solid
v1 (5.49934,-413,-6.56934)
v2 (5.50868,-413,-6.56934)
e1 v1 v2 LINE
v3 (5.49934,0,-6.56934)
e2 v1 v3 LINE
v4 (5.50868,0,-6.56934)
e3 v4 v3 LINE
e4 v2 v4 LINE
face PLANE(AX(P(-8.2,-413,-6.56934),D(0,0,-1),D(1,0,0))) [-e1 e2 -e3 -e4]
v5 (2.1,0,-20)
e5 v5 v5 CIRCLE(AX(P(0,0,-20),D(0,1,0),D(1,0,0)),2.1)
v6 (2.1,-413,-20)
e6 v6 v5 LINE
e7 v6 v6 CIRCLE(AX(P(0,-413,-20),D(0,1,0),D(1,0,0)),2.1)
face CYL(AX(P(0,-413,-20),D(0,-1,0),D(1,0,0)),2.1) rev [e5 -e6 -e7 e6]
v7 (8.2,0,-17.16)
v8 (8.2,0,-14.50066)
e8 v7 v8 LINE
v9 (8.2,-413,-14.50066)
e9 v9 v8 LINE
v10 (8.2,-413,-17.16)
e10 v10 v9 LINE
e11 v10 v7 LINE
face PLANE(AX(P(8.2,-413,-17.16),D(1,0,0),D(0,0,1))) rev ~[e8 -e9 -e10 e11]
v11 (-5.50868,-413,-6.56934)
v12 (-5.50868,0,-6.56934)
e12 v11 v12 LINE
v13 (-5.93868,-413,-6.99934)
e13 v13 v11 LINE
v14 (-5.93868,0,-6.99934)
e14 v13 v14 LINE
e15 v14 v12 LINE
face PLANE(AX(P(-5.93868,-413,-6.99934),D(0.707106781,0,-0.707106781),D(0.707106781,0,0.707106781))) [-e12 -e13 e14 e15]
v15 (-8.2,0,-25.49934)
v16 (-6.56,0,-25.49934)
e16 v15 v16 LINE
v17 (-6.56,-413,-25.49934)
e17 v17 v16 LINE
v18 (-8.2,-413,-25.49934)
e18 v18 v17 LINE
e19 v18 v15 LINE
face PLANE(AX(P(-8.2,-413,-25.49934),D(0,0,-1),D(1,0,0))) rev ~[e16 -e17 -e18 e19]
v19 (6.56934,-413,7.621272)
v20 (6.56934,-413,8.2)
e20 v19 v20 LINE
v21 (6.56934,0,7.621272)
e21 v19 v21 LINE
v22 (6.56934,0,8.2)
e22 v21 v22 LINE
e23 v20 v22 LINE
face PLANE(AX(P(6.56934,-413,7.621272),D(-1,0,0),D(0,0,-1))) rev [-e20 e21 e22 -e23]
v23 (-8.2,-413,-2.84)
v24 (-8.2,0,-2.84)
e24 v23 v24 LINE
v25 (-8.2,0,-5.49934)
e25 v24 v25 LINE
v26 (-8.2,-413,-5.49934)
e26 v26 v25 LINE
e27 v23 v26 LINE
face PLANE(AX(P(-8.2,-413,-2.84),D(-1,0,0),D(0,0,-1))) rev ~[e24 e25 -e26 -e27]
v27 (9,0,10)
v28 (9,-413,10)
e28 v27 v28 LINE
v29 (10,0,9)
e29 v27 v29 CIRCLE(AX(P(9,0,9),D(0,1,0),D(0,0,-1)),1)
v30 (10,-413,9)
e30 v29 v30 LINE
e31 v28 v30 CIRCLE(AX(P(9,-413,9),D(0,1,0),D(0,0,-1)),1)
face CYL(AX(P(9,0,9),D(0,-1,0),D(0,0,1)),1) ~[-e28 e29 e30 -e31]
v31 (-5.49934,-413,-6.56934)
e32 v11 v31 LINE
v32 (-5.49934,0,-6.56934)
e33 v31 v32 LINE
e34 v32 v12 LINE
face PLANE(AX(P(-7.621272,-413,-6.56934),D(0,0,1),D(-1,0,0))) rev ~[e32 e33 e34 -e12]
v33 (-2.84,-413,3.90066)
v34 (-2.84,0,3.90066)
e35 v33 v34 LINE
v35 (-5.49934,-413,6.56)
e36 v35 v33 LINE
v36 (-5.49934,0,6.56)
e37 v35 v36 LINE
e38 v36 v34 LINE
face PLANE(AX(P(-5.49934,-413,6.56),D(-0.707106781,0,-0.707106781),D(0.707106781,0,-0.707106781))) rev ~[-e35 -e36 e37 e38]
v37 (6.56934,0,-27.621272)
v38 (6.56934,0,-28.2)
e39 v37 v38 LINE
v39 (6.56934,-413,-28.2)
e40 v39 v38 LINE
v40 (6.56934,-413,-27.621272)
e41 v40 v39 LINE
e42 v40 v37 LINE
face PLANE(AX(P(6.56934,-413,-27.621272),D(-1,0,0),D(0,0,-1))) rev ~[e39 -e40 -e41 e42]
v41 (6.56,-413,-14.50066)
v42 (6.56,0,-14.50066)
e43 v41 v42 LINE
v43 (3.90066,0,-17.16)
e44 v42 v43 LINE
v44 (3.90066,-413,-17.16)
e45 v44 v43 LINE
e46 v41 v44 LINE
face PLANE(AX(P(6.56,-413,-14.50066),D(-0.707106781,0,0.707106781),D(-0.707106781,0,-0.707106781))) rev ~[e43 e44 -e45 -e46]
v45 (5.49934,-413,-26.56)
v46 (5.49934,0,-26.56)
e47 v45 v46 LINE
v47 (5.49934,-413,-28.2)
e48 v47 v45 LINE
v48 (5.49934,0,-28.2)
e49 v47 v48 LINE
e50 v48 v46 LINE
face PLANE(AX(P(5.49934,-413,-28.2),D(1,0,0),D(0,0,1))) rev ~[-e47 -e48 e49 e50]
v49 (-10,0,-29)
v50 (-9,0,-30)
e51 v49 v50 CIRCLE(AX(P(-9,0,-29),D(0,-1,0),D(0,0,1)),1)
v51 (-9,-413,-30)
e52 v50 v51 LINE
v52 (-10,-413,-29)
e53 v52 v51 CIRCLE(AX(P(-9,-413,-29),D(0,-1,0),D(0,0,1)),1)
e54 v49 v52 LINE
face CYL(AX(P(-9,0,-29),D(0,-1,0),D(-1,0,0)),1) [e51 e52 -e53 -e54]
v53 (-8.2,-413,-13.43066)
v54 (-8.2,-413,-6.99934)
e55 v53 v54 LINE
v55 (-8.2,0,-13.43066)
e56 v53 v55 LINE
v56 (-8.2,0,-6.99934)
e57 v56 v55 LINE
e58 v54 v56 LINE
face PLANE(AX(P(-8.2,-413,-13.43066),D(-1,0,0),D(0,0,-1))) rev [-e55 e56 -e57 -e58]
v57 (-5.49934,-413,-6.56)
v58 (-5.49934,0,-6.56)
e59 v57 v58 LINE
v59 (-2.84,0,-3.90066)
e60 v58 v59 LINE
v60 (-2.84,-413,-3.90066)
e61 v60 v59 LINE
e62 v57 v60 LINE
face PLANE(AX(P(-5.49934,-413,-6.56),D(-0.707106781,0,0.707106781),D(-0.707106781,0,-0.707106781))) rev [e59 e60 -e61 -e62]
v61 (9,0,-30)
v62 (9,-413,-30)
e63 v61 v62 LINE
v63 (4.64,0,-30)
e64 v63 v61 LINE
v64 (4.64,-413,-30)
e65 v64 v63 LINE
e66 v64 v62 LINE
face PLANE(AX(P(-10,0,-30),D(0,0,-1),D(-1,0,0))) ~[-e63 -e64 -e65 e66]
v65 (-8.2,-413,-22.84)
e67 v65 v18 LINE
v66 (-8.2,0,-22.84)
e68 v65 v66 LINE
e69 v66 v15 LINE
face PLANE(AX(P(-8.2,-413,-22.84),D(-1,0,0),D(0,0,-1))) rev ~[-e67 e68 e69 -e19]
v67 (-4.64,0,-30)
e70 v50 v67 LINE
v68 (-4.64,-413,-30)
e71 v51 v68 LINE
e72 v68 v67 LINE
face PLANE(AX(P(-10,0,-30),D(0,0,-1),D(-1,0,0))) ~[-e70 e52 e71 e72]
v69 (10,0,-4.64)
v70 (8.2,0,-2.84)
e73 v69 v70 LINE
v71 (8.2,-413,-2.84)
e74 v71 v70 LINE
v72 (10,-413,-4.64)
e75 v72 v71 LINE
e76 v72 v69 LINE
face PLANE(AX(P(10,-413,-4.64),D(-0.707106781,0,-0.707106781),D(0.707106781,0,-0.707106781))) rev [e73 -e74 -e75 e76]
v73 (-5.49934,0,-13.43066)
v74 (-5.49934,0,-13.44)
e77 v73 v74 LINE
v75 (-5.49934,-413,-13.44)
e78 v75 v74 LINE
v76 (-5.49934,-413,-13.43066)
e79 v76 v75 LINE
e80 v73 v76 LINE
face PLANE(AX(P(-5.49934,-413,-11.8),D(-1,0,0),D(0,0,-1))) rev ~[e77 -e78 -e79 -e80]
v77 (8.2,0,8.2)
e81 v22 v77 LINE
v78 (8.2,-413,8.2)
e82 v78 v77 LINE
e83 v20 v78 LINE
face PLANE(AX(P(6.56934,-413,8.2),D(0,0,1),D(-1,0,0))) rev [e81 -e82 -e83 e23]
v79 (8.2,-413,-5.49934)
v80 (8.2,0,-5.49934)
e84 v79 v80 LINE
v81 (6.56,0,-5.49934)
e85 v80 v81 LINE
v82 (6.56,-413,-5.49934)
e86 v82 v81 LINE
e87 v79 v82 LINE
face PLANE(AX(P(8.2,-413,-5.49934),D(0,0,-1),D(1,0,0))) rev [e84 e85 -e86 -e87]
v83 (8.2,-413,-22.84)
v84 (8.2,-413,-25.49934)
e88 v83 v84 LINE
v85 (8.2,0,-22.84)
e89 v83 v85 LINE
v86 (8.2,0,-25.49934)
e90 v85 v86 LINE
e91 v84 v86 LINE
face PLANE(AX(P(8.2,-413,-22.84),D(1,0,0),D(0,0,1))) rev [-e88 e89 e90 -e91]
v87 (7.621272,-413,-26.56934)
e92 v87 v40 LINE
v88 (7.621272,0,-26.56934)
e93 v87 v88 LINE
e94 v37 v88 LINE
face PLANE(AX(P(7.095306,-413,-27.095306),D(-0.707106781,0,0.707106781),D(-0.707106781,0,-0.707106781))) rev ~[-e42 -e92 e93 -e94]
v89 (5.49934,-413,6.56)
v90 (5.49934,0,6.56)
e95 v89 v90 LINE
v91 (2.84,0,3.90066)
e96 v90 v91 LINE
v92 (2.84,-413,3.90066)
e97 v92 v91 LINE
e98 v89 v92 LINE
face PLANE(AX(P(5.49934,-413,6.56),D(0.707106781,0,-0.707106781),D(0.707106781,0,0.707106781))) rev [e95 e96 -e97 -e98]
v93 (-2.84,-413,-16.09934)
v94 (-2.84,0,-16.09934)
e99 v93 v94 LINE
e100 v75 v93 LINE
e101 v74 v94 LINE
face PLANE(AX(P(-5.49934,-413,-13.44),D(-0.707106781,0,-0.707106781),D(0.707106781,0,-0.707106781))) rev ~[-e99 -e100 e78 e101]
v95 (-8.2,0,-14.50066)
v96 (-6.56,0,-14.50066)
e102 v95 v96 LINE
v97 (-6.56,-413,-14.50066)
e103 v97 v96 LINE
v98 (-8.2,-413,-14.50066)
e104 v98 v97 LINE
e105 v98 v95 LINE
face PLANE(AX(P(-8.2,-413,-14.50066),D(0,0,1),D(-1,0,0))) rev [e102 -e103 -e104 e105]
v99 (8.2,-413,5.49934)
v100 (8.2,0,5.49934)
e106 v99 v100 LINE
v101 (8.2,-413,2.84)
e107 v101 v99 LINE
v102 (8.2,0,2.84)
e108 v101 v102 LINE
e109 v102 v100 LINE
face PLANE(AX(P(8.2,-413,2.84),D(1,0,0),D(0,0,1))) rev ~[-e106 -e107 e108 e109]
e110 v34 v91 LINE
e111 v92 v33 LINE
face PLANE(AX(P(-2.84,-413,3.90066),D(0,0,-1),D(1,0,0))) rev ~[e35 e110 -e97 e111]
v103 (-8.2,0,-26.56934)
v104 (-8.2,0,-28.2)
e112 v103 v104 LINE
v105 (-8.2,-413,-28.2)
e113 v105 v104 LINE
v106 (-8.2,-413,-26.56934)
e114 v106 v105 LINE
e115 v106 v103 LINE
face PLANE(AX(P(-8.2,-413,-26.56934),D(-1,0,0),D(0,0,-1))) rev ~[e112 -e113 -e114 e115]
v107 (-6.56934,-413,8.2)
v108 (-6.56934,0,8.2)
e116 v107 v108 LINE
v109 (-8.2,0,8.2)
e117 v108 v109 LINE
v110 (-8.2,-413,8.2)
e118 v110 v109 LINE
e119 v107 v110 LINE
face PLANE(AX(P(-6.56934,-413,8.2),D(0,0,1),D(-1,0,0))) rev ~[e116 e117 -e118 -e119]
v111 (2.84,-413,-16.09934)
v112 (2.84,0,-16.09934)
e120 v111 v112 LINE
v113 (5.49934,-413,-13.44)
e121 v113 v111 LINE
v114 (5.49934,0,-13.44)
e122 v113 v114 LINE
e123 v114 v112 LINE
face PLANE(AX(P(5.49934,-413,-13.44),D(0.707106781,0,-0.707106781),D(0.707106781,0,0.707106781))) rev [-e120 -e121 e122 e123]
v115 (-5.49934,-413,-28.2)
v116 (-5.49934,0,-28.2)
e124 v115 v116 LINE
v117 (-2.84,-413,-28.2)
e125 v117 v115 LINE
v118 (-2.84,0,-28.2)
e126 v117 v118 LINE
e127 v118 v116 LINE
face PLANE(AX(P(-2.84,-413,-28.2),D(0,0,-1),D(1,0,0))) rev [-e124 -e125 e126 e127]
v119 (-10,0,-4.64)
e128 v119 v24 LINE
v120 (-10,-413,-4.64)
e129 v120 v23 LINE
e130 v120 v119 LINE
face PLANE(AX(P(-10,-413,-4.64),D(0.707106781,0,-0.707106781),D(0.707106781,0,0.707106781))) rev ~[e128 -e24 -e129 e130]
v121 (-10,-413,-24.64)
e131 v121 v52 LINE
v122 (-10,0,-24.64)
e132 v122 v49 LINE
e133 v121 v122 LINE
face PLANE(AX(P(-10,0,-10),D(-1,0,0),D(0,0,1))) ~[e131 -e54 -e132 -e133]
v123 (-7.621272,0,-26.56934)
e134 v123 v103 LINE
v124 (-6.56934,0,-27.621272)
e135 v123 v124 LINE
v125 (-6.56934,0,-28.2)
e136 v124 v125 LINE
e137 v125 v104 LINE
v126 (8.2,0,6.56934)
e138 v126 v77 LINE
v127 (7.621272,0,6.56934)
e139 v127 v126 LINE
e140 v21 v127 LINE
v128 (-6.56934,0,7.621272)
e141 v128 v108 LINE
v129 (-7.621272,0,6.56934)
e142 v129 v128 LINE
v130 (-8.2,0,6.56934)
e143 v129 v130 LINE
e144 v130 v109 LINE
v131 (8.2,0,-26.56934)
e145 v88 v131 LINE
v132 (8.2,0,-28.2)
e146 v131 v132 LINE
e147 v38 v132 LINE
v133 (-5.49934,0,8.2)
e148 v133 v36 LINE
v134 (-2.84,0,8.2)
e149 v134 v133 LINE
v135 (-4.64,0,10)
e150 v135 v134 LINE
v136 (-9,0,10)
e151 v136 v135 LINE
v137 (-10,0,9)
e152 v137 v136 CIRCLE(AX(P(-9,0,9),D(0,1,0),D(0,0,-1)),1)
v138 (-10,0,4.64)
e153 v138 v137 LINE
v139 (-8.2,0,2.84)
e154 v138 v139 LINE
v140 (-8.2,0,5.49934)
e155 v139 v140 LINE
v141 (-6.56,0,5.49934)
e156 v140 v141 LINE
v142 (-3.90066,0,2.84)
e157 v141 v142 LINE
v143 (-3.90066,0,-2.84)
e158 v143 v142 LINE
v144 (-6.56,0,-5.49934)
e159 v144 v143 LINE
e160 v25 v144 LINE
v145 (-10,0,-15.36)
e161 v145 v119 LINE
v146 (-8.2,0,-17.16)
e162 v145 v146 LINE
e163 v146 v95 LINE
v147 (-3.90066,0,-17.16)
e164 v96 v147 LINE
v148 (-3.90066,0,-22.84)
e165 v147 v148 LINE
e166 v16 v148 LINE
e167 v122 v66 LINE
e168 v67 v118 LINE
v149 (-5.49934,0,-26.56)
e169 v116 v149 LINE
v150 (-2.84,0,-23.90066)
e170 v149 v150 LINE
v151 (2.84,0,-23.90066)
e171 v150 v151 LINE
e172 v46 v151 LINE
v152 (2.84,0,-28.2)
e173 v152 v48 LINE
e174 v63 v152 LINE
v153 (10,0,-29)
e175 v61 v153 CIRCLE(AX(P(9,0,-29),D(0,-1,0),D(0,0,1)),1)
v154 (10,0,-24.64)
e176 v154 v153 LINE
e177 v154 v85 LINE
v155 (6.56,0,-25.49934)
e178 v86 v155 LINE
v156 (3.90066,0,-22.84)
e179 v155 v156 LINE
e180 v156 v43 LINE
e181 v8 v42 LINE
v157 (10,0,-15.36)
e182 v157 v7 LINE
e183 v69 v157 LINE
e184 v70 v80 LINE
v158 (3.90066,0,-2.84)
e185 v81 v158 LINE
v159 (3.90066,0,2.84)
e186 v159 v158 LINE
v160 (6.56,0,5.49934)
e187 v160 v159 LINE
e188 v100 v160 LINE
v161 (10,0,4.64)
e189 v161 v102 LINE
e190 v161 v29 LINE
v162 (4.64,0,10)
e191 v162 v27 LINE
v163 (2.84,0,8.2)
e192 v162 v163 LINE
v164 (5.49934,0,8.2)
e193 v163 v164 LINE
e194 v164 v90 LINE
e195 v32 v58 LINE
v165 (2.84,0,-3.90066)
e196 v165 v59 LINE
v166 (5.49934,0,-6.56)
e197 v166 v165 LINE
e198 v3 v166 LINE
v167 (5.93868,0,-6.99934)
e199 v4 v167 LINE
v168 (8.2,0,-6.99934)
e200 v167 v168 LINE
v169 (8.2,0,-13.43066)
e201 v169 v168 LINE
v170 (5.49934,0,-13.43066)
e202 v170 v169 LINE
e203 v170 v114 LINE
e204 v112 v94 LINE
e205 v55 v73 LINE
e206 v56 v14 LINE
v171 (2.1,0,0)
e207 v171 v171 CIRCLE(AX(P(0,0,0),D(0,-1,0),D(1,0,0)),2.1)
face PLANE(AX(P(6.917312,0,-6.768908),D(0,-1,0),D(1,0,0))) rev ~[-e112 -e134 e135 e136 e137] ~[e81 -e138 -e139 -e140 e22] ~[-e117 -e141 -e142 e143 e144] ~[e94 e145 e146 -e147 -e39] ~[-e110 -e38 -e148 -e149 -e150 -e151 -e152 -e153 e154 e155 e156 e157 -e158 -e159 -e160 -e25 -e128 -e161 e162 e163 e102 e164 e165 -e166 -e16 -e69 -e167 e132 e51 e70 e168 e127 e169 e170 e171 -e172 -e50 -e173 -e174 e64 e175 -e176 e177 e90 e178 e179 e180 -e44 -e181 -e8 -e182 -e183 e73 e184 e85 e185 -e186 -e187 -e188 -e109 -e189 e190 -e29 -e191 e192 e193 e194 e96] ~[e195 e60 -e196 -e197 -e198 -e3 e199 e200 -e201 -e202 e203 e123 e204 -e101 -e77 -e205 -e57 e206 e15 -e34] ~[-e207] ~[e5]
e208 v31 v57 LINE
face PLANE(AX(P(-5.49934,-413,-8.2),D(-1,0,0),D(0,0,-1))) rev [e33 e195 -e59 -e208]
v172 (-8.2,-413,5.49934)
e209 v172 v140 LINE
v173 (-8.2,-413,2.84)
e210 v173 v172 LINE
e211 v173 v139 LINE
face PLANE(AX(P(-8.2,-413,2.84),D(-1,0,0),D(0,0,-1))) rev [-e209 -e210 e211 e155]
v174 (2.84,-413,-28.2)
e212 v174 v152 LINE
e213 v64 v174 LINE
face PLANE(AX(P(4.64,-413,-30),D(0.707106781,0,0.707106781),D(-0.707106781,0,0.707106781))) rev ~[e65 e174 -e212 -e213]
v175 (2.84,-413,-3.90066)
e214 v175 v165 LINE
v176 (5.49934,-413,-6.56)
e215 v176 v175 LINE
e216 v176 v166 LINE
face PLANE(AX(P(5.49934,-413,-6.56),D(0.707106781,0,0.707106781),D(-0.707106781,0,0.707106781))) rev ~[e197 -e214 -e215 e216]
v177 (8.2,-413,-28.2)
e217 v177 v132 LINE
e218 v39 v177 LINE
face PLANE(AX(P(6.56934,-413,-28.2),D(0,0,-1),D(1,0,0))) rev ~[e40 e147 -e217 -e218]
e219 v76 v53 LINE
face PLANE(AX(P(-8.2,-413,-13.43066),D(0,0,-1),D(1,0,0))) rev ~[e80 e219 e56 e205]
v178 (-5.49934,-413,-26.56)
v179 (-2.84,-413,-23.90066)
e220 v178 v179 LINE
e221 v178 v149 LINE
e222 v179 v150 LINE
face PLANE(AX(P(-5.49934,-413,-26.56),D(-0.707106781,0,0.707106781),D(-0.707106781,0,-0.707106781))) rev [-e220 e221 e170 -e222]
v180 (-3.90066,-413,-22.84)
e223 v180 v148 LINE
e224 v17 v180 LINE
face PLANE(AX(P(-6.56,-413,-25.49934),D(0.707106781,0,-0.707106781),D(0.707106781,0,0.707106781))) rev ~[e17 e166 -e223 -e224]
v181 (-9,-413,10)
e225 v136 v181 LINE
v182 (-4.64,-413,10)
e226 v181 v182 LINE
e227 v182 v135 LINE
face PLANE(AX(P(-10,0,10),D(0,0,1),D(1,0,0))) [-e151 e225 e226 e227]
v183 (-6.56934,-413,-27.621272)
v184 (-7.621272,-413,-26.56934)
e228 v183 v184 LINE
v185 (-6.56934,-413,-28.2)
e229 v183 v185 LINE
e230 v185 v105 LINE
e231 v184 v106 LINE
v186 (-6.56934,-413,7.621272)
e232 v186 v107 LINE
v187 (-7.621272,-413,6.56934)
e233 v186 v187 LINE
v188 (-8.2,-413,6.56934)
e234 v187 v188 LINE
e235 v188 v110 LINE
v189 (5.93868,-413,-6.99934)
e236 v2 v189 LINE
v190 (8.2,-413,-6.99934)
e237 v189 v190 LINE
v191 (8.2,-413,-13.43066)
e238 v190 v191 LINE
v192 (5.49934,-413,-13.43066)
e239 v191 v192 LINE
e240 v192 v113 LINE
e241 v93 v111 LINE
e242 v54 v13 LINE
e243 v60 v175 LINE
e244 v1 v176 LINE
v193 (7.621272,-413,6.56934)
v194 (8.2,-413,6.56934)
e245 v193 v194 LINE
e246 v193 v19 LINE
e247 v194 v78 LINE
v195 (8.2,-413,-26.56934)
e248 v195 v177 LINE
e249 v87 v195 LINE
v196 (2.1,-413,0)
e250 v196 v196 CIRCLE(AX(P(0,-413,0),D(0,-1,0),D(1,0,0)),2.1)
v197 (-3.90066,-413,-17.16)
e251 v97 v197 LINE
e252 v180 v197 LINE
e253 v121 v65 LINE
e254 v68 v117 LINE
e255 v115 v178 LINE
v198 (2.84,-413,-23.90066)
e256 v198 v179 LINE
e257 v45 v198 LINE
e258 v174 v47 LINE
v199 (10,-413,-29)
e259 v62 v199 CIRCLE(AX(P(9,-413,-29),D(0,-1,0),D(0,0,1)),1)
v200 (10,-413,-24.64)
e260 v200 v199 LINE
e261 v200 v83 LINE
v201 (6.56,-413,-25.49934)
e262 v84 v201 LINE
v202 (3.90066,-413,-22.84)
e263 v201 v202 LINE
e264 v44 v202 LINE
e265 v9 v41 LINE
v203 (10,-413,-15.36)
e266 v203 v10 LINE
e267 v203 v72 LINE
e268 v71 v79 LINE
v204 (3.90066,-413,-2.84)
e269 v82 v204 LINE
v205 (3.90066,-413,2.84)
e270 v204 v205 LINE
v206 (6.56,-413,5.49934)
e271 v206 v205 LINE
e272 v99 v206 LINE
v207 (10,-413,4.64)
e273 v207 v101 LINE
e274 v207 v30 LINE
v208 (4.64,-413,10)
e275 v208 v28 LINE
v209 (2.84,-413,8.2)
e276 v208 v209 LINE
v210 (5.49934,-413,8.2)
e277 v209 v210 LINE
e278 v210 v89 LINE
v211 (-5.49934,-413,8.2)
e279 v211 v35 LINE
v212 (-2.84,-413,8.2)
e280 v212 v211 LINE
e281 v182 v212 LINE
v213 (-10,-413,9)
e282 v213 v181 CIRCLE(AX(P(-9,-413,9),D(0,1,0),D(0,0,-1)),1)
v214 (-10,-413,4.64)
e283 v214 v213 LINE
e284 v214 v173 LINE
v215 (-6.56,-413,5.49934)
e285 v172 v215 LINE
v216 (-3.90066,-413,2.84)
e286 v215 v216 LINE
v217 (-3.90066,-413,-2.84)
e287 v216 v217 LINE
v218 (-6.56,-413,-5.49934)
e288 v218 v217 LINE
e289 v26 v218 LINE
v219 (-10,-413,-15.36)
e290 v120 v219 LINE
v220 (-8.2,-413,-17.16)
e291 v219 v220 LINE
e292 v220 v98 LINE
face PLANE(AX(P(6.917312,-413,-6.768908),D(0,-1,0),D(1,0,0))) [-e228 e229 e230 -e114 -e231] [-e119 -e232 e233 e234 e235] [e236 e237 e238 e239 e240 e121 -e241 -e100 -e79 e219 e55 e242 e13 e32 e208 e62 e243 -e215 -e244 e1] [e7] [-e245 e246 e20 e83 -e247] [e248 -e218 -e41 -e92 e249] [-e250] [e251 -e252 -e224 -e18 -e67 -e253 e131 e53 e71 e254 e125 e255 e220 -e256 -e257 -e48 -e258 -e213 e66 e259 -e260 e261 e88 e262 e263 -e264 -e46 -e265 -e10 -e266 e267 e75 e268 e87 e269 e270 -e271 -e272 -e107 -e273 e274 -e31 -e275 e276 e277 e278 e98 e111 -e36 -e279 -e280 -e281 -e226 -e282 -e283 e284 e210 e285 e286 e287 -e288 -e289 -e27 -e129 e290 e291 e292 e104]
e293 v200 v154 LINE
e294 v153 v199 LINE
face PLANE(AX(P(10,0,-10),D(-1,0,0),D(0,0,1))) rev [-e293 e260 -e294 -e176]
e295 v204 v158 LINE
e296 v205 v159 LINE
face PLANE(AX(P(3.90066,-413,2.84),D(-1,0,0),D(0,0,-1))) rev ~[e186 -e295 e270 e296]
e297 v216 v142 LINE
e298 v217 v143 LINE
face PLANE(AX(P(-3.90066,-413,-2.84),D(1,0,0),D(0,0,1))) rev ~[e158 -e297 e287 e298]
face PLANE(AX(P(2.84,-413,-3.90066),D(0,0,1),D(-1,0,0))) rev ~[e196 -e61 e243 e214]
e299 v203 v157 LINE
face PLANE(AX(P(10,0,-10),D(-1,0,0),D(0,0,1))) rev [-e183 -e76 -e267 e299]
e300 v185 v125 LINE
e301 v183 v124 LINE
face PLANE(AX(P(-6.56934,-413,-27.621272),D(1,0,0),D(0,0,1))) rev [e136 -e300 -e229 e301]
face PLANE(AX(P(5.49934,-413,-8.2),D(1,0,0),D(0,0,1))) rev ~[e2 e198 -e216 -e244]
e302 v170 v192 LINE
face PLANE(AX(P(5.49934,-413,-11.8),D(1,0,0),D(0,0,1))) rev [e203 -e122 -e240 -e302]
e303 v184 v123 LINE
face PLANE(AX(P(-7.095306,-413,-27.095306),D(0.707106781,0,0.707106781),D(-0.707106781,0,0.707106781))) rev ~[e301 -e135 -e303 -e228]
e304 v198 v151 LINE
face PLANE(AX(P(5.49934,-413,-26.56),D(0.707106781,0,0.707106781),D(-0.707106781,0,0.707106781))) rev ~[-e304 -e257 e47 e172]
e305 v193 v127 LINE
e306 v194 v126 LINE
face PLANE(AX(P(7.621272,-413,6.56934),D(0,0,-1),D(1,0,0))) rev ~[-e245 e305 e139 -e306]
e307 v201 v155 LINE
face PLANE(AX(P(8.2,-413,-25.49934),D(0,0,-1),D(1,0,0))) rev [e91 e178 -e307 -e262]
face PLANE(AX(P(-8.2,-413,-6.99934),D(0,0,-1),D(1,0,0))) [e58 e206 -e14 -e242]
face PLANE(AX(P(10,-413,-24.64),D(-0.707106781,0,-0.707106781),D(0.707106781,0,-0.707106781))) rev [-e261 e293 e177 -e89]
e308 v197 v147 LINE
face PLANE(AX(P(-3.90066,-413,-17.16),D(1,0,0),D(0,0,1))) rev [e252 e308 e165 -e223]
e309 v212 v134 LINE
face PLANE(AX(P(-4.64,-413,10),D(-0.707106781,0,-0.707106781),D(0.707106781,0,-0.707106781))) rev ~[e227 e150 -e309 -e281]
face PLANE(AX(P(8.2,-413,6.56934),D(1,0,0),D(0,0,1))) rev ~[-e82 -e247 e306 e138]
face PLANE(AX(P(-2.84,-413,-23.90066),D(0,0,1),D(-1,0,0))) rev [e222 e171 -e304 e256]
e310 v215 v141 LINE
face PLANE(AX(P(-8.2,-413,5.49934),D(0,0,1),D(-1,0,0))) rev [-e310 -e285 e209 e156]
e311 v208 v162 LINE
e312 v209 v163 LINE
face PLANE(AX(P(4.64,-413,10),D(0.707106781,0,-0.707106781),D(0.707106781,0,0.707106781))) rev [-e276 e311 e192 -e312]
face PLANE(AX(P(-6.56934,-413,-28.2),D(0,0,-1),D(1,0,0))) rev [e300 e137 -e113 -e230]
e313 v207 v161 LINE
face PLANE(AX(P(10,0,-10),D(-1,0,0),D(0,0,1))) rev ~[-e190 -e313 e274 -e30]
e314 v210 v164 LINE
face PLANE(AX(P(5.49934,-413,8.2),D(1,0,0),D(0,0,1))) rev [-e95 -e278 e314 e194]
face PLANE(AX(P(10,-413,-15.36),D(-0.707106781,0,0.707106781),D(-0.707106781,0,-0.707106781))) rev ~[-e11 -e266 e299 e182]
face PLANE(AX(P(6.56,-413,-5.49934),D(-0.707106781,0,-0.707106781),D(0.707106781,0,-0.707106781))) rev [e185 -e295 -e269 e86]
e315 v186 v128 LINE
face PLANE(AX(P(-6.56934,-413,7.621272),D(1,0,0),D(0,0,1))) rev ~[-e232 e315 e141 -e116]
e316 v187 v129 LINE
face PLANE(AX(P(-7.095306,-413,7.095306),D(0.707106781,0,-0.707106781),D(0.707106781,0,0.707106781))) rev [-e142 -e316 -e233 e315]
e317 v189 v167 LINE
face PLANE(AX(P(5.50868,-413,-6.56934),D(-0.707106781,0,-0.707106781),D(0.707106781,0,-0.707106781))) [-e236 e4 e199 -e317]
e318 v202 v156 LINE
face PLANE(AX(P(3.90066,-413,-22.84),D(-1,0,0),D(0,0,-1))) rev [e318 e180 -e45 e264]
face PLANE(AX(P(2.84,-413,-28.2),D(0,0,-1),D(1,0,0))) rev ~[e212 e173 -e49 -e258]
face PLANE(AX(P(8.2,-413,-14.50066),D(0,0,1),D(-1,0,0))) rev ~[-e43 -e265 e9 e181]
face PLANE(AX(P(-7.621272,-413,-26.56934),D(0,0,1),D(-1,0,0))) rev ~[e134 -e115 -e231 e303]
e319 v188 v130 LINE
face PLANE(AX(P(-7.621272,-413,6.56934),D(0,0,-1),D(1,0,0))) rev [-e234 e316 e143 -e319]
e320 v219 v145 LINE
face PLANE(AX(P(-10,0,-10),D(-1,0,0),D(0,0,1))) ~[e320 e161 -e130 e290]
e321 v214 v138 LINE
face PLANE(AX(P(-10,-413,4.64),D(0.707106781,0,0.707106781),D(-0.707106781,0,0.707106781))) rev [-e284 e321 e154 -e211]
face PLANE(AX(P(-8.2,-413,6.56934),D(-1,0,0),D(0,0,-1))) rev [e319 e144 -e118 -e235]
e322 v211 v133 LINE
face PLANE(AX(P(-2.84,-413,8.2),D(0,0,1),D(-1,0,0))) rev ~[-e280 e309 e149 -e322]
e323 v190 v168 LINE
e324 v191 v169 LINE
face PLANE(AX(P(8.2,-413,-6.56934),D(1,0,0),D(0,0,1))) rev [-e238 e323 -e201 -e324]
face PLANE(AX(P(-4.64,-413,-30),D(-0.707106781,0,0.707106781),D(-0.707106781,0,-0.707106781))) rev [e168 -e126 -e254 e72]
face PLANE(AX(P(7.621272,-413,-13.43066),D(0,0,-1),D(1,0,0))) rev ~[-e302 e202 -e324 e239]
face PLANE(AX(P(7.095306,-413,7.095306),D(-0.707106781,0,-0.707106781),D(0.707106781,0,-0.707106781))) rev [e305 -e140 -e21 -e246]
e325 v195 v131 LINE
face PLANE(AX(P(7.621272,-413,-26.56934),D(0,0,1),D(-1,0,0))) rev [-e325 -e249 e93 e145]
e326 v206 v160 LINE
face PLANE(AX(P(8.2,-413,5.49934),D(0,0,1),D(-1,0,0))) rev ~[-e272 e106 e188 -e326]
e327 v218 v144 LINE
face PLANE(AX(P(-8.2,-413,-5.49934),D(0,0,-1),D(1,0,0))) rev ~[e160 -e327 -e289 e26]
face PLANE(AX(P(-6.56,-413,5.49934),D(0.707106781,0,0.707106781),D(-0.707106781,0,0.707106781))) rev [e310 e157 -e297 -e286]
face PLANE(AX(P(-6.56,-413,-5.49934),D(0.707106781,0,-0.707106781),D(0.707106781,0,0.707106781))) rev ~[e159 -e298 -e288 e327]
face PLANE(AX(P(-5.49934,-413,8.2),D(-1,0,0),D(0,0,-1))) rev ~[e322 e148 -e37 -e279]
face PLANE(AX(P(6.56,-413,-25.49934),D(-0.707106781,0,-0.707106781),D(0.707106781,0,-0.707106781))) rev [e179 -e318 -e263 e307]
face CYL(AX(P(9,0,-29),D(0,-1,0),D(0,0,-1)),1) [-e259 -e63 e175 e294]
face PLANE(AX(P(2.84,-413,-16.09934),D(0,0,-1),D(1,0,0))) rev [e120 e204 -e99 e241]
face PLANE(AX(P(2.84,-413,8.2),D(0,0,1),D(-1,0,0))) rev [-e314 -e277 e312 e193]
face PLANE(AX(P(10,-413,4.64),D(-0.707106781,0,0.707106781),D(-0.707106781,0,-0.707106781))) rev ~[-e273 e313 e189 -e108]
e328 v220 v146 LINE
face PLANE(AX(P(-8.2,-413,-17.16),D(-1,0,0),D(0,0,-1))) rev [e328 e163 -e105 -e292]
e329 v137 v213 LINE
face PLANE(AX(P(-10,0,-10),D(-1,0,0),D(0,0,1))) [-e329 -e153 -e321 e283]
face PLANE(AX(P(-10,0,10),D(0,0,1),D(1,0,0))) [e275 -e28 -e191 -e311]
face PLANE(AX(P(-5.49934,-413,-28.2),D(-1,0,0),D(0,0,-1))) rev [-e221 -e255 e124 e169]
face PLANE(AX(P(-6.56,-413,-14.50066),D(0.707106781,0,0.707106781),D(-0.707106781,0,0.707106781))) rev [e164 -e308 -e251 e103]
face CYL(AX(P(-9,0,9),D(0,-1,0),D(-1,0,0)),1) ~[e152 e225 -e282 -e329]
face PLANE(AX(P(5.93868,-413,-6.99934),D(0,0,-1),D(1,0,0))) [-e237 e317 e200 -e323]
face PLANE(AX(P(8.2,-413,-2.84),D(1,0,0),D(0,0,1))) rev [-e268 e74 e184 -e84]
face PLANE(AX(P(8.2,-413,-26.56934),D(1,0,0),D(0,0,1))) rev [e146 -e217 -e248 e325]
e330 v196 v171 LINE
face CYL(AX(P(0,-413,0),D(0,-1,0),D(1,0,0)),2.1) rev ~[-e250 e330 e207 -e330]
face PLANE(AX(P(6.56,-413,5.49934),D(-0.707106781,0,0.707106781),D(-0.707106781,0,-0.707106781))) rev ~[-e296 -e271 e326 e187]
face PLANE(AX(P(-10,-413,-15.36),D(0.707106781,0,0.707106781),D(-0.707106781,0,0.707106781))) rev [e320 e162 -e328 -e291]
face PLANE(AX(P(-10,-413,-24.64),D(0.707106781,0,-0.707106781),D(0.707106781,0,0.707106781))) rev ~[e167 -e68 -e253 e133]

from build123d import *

# Parameters (mm, degrees)
F0_W             = 20
F0_H             = 20
F1_DEPTH         = 413
F2_R             = 2.1
F3_DEPTH         = 413.001
F4_R             = 1
F6_DEPTH         = 413.001
F6_COPIES3_COUNT = 2
F6_COPIES3_ANGLE = 90
F6_COPIES4_COUNT = 2
F6_COPIES4_ANGLE = 270
F6_COPIES6_COUNT = 2
F9_W             = 16.4
F9_H             = 6.8613203436
F10_DEPTH        = 413.001
F12_DEPTH        = 413


# Not quite as in the source:
# - a pattern or mirror of a feature is missing from the dataset's text; its kind, count and spacing are read off the source's solid


with BuildPart() as f1:
    # F0 (on Front) → F1 (new body)
    with BuildSketch(Plane.XZ):
        Rectangle(F0_W, F0_H)
    extrude(amount=F1_DEPTH)

    # F2 (on face) → F3 (cut, through all)
    with BuildSketch(Plane.XZ.offset(413)):
        Circle(F2_R)
    extrude(amount=-F3_DEPTH, mode=Mode.SUBTRACT)

    # F4
    f4_edges = [f1.edges().sort_by_distance(p)[0] for p in [
        (-10, -206.5, 10),
        (10, -206.5, 10),
    ]]
    fillet(f4_edges, radius=F4_R)

    # F5 (on face) → F6 (cut, through all)
    with BuildSketch(Plane.XZ.offset(413)):
        Polygon((0, 3.9006601718), (0, 10), (-2.84, 10), (-4.64, 10), (-2.84, 8.2), (-5.4993398282, 8.2), (-5.4993398282, 6.56), (-2.84, 3.9006601718), align=None)
        Polygon((-6.5693398282, 8.2), (-8.2, 8.2), (-7.0953059148, 7.0953059148), (-6.5693398282, 7.6212720014), align=None)
    f6 = extrude(amount=-F6_DEPTH, mode=Mode.SUBTRACT)

    # F6_copies: F6 across plane
    add(f6.mirror(Plane(origin=(0, 0, 0), x_dir=(-0.7071067812, 0, -0.7071067812), z_dir=(0.7071067812, 0, -0.7071067812))), mode=Mode.SUBTRACT)

    # F6_copies1: F6 across plane
    add(f6.mirror(Plane(origin=(0, 0, 0), x_dir=(0.7071067812, 0, -0.7071067812), z_dir=(-0.7071067812, 0, -0.7071067812))), mode=Mode.SUBTRACT)

    # F6_copies2: F6 across plane
    add(f6.mirror(Plane(origin=(0, 0, 0), x_dir=(0, 0, 1), z_dir=(1, 0, 0))), mode=Mode.SUBTRACT)

    # F6_copies3: F6 ×2 about axis
    f6_copies3_axis = Axis((0, 0, 0), (0, 1, 0))
    for i in range(1, F6_COPIES3_COUNT):
        add(f6.rotate(f6_copies3_axis, i * F6_COPIES3_ANGLE / (F6_COPIES3_COUNT - 1)), mode=Mode.SUBTRACT)

    # F6_copies4: F6 ×2 about axis
    f6_copies4_axis = Axis((0, 0, 0), (0, 1, 0))
    for i in range(1, F6_COPIES4_COUNT):
        add(f6.rotate(f6_copies4_axis, i * F6_COPIES4_ANGLE / (F6_COPIES4_COUNT - 1)), mode=Mode.SUBTRACT)

    # F6_copies5: F6 across plane
    add(f6.mirror(Plane(origin=(0, 0, 0), x_dir=(-1, 0, 0), z_dir=(0, 0, -1))), mode=Mode.SUBTRACT)

    # F6_copies6: F6 ×2 about axis
    f6_copies6_axis = Axis((0, 0, 0), (0, 1, 0))
    for i in range(1, F6_COPIES6_COUNT):
        add(f6.rotate(f6_copies6_axis, i * 360 / F6_COPIES6_COUNT), mode=Mode.SUBTRACT)

    # F8: F1 across face


with BuildPart() as f1_1:
    add(f1.part)
    add(f1.part.mirror(Plane(origin=(-7.32, -206.5, -10), x_dir=(1, 0, 0), z_dir=(0, 0, -1))))

    # F9 (on face) → F10 (cut, through all)
    with BuildSketch(Plane.XZ.offset(413)):
        with Locations((0, -10)):
            Rectangle(F9_W, F9_H)
    extrude(amount=-F10_DEPTH, mode=Mode.SUBTRACT)

    # F11 (on face) → F12 (join, through all)
    with BuildSketch(Plane.XZ.offset(413)):
        with BuildLine():
            ThreePointArc((-9, -10), (-9.7071067812, -9.7071067812), (-10, -9))
            Line((-10, -9), (-10, -11))
            ThreePointArc((-10, -11), (-9.7071067812, -10.2928932188), (-9, -10))
        make_face()
        with BuildLine():
            ThreePointArc((10, -9), (9.7071067812, -9.7071067812), (9, -10))
            ThreePointArc((9, -10), (9.7071067812, -10.2928932188), (10, -11))
            Line((10, -11), (10, -9))
        make_face()
        Polygon((5.9386796564, -6.9993398282), (8.2, -6.9993398282), (8.2, -6.5693398282), (5.5086796564, -6.5693398282), align=None)
        Polygon((-8.2, -6.5693398282), (-8.2, -6.9993398282), (-5.9386796564, -6.9993398282), (-5.5086796564, -6.5693398282), align=None)
    extrude(amount=-F12_DEPTH)


solid = f1_1.part
